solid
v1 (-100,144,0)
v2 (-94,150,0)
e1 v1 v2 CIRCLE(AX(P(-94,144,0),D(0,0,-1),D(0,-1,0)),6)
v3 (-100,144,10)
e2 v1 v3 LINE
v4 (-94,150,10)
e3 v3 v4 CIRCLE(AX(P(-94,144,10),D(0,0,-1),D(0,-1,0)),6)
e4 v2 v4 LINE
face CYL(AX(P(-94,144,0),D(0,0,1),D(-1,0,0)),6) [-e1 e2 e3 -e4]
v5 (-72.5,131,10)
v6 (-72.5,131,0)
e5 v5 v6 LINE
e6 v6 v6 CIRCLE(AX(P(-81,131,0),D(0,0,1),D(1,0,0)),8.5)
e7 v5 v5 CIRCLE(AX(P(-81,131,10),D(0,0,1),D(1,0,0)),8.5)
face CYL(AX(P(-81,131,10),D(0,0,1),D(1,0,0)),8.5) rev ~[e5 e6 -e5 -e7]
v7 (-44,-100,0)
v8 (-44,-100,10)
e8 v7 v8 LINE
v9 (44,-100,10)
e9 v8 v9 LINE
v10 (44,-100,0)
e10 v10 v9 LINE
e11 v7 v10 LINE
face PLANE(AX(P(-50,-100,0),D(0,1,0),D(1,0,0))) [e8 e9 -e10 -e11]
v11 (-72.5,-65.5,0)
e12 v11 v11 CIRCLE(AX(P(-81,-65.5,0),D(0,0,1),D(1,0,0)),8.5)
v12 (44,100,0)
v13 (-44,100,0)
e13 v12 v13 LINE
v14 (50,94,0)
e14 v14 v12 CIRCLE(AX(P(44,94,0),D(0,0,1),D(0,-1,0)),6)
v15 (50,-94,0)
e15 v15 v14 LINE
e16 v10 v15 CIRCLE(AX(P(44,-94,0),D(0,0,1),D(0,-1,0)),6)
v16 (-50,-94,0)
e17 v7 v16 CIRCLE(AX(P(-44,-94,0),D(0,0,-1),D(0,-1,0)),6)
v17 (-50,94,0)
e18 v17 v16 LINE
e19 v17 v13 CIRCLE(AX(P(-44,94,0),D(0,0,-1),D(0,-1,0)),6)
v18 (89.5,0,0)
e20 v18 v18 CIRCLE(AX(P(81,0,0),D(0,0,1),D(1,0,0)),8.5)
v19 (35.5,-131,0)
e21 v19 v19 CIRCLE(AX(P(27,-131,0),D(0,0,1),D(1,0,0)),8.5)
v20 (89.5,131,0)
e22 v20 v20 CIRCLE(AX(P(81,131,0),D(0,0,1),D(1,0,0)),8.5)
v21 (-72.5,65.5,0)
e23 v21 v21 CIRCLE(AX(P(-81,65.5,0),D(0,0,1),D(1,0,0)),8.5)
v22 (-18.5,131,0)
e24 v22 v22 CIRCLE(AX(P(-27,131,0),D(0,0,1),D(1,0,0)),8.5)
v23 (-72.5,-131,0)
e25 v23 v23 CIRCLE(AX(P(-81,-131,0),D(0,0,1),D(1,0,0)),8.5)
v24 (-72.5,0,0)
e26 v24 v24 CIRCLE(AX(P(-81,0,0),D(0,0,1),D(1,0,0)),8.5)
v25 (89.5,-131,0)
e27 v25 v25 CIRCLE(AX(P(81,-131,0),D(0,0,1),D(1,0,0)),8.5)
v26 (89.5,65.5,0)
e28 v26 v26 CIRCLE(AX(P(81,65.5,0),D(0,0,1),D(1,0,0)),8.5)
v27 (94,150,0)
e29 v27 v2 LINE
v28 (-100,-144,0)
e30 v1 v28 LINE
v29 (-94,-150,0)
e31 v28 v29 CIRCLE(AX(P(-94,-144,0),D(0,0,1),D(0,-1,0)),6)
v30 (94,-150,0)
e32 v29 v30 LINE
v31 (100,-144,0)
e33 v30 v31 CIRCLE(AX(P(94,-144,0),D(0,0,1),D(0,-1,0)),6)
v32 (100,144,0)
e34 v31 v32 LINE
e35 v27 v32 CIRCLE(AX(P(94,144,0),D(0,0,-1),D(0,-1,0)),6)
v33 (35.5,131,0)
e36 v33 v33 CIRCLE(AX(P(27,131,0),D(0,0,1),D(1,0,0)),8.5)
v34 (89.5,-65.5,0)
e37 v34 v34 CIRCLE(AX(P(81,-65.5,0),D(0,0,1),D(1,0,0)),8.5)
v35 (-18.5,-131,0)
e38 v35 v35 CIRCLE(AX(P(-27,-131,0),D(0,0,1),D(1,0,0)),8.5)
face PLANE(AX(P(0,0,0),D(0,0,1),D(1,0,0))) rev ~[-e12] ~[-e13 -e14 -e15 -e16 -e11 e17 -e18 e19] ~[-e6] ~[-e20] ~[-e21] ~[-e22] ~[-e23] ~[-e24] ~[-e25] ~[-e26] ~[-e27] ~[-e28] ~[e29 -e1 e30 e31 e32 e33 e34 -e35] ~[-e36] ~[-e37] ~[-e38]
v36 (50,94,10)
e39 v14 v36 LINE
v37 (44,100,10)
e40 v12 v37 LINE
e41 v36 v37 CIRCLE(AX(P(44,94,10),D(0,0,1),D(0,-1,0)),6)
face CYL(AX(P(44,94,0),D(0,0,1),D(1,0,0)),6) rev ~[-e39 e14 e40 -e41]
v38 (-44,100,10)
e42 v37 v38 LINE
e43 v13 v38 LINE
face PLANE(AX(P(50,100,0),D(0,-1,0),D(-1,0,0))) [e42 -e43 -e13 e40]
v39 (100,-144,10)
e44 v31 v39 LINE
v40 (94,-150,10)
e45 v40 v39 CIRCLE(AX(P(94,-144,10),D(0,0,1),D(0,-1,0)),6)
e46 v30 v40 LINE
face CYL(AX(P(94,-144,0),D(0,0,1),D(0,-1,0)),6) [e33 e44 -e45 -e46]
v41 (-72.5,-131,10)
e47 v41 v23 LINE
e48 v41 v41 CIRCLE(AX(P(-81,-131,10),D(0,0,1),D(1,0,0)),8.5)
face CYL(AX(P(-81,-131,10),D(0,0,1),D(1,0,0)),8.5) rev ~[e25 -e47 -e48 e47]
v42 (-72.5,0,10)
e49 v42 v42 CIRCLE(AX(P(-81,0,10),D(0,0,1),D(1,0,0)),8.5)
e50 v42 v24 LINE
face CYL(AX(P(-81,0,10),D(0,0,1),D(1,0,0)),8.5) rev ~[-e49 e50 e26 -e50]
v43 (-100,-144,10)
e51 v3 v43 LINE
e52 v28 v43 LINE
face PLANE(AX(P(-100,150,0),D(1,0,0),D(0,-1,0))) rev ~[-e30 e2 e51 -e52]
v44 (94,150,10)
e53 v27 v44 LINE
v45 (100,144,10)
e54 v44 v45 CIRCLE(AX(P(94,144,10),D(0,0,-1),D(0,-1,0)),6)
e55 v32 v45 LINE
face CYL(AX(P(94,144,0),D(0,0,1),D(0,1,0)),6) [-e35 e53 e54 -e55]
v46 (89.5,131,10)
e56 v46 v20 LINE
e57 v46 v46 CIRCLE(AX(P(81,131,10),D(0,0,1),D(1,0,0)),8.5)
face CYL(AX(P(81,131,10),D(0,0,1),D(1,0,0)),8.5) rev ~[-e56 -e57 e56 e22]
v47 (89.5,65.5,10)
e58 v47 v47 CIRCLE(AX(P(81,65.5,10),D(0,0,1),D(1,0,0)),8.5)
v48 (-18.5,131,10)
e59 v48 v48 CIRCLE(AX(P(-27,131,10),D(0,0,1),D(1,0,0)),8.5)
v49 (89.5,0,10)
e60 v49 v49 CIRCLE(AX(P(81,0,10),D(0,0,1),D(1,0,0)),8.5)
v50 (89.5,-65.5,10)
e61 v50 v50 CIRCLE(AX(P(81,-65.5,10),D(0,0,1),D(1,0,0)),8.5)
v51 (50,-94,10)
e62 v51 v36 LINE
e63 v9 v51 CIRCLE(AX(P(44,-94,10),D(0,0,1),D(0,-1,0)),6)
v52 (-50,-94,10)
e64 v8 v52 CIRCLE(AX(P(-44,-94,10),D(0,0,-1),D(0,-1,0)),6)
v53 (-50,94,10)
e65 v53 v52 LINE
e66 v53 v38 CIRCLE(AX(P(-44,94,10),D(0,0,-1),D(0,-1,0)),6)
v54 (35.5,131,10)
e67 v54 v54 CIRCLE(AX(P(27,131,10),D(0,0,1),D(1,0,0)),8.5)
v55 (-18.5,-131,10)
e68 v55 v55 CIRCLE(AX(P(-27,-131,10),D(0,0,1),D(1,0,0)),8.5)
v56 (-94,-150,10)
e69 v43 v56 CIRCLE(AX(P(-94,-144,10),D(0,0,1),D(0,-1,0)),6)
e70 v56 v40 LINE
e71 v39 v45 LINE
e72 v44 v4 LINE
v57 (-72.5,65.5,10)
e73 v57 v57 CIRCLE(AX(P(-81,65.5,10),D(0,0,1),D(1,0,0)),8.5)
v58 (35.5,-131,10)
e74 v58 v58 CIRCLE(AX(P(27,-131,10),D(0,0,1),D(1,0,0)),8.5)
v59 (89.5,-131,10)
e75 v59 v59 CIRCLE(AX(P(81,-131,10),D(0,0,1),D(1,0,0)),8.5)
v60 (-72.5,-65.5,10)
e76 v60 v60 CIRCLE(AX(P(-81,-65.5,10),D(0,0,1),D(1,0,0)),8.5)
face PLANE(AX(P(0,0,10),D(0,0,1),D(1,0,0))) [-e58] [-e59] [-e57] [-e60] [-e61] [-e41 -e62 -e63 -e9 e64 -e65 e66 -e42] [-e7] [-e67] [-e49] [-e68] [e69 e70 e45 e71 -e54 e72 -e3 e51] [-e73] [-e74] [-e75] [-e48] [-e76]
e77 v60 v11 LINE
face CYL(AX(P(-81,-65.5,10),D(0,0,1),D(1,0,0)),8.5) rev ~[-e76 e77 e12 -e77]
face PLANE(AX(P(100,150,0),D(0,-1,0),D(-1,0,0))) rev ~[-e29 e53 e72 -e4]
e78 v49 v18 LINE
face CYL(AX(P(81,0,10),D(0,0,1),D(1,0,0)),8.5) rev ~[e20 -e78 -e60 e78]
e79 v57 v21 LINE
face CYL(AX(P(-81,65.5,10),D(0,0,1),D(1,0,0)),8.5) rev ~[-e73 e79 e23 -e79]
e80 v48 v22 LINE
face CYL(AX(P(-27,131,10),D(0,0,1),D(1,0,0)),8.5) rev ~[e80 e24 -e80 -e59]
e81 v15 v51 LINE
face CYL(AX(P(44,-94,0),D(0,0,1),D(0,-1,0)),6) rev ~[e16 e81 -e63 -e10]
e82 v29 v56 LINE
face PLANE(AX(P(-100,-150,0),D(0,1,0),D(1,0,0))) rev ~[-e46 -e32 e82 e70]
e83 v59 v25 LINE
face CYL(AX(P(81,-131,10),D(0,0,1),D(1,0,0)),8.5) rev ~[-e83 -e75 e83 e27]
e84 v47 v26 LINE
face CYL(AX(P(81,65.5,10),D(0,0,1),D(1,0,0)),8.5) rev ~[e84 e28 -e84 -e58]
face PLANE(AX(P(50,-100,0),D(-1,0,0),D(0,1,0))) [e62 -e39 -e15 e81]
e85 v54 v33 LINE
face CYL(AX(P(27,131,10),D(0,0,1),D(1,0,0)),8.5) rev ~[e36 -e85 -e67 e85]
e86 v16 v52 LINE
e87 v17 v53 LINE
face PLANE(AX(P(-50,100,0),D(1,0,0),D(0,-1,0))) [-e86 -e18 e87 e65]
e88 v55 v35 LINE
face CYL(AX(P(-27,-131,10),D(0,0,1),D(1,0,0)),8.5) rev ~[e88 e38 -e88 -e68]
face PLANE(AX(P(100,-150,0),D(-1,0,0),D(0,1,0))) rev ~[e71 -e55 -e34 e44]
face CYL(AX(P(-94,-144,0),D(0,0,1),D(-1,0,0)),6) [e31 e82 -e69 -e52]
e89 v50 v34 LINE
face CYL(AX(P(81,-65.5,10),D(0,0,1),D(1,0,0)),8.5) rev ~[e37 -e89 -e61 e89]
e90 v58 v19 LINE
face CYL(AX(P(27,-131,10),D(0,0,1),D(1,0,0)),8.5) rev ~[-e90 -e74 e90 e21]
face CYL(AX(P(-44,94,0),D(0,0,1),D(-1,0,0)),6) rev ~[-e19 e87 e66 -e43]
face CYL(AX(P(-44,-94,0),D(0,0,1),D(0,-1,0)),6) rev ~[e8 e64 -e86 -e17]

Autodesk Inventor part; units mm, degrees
ref_plane "YZ Plane" through (0, 0, 0) normal (1, 0, 0) x (0, 1, 0)
ref_plane "XZ Plane" through (0, 0, 0) normal (0, 1, 0) x (-1, 0, 0)
ref_plane "XY Plane" through (0, 0, 0) normal (0, 0, 1) x (1, 0, 0)
sketch "Sketch2" plane through (0, 0, 0) normal (0, 0, 1) x (1, 0, 0)
  line L0 (-50, -100) -> (50, -100)
  line L1 (50, -100) -> (50, 100)
  line L2 (50, 100) -> (-50, 100)
  line L3 (-50, 100) -> (-50, -100)
  line L4 (-50, -100) -> (50, 100) construction
  line L5 (50, -100) -> (-50, 100) construction
  line L6 (-100, -150) -> (100, -150)
  line L7 (100, -150) -> (100, 150)
  line L8 (100, 150) -> (-100, 150)
  line L9 (-100, 150) -> (-100, -150)
  point P0 (0, 0)
  dimension "d29" = 100
  dimension "d30" = 200
  dimension "d31" = 50
extrude "Plate2" add sketch "Sketch2" along normal blind 10
sketch "Sketch5" plane through (0, 0, 10) normal (0, 0, 1) x (1, 0, 0)
  line L0 (50, 100) -> (50, -100) construction
  line L1 (50, -100) -> (-50, -100) construction
  line L2 (-50, -100) -> (-50, 100) construction
  line L3 (-50, 100) -> (50, 100) construction
  line L4 (100, -150) -> (-100, -150) construction
  line L5 (100, 150) -> (100, -150) construction
  line L6 (-100, 150) -> (100, 150) construction
  line L7 (-100, -150) -> (-100, 150) construction
  line L8 (-81, 131) -> (81, 131) construction
  line L9 (81, 131) -> (81, -131) construction
  line L10 (81, -131) -> (-81, -131) construction
  line L11 (-81, -131) -> (-81, 131) construction
  circle A0 centre (-81, -131) radius 8.5
  circle A1 centre (-81, 131) radius 8.5
  circle A2 centre (-81, 0) radius 8.5
  circle A3 centre (-81, -65.5) radius 8.5
  circle A4 centre (-81, 65.5) radius 8.5
  line L12 (-50, 0) -> (50, 0) construction
  circle A5 centre (-27, -131) radius 8.5
  circle A6 centre (-27, -65.5) radius 8.5
  circle A7 centre (-27, 0) radius 8.5
  circle A8 centre (-27, 65.5) radius 8.5
  circle A9 centre (-27, 131) radius 8.5
  circle A10 centre (27, -131) radius 8.5
  circle A11 centre (27, -65.5) radius 8.5
  circle A12 centre (27, 0) radius 8.5
  circle A13 centre (27, 65.5) radius 8.5
  circle A14 centre (27, 131) radius 8.5
  circle A15 centre (81, -131) radius 8.5
  circle A16 centre (81, -65.5) radius 8.5
  circle A17 centre (81, 0) radius 8.5
  circle A18 centre (81, 65.5) radius 8.5
  circle A19 centre (81, 131) radius 8.5
  point P0 (0, 0)
  point P1 (0, -131)
  dimension "d33" = 17
  dimension "d34" = 19
  dimension "d35" = 65.5
  dimension "d36" = 65.5
  dimension "d39" = 54
extrude "Cut3" cut sketch "Sketch5" against normal blind 10
fillet "Corner Round1" radius 6 8 edges at (-100, -150, 5) (-100, 150, 5) (100, 150, 5) (100, -150, 5) (50, -100, 5) (-50, -100, 5) (-50, 100, 5) (50, 100, 5)
equation "\"d35\" = d36"
equation "\"d44\" = Thickness"
equation "\"d14\" = Thickness"
equation "\"BendReliefDepth\" = 0.5 * Thickness"
equation "\"TransitionRadius\" = BendRadius"
equation "\"JacobiRadiusSize\" = BendRadius"
equation "\"Thickness\" = 10"
equation "\"BendRadius\" = 6"
properties part number "SLM 1706 charging flange round" material "Steel"
